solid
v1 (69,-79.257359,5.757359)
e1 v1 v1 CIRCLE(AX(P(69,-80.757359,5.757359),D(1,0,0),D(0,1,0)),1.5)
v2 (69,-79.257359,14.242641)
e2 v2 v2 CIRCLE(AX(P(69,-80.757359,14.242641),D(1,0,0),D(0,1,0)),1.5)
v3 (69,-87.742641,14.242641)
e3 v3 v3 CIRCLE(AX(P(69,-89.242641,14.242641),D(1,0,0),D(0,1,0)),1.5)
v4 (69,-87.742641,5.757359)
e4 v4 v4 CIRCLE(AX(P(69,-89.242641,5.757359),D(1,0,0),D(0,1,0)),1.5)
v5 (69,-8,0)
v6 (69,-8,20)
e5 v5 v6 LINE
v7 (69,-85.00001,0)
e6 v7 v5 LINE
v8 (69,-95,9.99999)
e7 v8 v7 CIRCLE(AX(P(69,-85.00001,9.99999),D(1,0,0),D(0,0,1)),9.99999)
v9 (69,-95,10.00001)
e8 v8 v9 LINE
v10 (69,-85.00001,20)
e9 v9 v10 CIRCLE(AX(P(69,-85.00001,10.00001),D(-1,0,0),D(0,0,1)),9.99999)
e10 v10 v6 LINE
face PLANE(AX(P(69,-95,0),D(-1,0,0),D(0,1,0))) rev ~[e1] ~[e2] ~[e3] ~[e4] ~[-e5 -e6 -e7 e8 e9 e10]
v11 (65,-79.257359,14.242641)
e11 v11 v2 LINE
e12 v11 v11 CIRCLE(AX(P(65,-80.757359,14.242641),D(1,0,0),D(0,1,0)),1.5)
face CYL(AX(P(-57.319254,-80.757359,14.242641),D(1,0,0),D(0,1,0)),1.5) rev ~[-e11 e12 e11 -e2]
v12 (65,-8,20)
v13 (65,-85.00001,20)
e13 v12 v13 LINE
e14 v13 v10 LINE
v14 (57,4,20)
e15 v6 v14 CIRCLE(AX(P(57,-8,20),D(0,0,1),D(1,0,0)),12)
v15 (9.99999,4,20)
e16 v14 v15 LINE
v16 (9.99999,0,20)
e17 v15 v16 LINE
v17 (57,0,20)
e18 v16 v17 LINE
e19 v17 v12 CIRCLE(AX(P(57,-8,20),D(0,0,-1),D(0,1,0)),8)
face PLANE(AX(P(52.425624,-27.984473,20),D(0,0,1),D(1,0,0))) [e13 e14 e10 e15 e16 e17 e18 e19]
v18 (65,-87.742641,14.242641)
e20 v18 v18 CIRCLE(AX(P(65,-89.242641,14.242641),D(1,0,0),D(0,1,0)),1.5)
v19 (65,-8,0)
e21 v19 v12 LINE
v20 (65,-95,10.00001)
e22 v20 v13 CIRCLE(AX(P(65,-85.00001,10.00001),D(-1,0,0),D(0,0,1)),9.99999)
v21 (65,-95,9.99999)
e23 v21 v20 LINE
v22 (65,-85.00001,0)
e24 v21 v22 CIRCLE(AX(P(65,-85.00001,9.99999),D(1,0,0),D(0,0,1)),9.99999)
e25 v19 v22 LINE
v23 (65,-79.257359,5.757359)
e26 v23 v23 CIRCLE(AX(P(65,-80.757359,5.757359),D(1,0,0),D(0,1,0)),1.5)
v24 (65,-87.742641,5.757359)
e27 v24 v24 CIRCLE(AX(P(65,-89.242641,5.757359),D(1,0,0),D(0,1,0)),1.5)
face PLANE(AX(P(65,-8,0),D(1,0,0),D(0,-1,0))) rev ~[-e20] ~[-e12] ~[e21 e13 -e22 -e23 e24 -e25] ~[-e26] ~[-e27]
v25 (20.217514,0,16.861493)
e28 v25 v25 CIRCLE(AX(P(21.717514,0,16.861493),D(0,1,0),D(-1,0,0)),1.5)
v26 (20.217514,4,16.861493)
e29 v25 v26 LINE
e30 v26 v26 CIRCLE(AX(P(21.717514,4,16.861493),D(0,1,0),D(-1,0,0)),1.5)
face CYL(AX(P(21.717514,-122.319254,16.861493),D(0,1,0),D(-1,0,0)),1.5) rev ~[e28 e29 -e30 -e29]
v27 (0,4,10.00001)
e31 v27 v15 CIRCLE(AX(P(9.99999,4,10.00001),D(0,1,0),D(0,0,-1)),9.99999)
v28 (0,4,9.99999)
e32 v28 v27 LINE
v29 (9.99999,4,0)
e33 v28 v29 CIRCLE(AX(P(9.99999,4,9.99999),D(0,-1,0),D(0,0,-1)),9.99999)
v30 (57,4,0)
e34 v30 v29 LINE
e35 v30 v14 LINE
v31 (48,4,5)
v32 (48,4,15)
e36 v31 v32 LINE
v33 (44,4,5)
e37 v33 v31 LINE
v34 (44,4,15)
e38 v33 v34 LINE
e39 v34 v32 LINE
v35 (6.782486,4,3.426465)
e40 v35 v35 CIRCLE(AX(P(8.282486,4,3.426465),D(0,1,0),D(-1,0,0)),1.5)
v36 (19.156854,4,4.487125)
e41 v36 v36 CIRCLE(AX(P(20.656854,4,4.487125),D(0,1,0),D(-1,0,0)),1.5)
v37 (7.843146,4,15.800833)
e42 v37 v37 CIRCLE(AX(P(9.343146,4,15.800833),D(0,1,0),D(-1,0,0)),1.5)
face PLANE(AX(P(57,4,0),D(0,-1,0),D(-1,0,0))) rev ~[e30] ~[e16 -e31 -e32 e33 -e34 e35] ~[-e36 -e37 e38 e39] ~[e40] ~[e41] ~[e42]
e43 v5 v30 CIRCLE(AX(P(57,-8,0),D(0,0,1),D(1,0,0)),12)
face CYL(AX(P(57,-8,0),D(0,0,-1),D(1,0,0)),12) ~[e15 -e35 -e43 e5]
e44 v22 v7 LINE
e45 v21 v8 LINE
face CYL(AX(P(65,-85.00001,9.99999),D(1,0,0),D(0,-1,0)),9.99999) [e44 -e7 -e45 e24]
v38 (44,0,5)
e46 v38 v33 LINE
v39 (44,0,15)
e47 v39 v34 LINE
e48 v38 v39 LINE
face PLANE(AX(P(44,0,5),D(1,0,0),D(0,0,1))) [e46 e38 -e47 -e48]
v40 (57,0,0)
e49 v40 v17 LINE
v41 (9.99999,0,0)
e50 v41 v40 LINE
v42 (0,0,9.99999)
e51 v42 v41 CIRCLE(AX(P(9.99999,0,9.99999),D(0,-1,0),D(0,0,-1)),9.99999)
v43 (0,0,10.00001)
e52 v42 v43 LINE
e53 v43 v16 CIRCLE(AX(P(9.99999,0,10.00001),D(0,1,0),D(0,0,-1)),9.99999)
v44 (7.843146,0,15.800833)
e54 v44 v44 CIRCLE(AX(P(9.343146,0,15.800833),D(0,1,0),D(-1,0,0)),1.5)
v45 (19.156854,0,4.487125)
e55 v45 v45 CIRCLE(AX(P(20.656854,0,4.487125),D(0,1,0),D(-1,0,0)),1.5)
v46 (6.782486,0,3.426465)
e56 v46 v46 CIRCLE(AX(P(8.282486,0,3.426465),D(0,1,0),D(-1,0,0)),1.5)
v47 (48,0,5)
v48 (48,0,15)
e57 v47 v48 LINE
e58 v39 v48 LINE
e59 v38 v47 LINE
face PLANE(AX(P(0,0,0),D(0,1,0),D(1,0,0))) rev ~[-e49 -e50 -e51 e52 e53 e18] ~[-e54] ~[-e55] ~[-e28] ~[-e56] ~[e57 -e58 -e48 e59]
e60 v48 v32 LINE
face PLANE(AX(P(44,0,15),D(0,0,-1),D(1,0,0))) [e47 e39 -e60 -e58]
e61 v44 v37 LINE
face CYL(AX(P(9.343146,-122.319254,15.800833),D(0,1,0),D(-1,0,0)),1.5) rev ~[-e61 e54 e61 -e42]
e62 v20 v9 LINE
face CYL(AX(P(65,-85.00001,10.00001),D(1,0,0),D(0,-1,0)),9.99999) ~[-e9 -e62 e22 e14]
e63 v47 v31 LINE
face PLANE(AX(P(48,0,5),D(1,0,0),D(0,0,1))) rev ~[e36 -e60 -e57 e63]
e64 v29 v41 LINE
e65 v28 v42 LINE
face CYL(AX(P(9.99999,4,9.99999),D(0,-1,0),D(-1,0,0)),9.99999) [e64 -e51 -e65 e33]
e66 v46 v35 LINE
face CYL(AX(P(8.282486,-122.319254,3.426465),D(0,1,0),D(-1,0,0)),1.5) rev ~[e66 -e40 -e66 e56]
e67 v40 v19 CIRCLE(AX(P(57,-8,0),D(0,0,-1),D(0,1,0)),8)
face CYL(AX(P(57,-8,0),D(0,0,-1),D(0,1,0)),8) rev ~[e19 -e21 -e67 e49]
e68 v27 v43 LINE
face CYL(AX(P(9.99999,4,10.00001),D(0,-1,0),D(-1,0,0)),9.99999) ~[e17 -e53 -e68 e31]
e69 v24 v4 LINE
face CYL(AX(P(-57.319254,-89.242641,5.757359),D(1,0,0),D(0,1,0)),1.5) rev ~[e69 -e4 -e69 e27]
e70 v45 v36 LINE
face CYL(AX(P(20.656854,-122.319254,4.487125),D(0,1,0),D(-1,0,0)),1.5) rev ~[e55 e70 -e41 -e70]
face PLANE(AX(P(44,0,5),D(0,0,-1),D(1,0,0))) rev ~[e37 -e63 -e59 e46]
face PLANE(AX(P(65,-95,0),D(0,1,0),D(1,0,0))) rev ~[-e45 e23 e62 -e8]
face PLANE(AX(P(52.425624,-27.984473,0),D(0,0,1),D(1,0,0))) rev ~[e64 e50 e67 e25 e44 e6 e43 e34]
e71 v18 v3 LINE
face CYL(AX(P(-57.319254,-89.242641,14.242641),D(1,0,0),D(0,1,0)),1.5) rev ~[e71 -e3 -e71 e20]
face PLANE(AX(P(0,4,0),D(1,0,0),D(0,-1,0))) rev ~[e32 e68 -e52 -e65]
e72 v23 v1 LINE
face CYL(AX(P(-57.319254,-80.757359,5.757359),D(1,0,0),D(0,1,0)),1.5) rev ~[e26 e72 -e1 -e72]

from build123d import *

# Parameters (mm, degrees)
F1_DEPTH = 20
F4_R     = 9.99999
F6_D     = 3
F2_W     = 4
F2_H     = 10
F7_DEPTH = 25
F8_D     = 3


# Not quite as in the source:
# - a fillet or chamfer is up to 0.001 mm smaller than in the source, because OpenCascade refuses the exact size
# - a feature names something its author has since deleted; it is built from what else it names


with BuildPart() as f1:
    # F0 (on Top) → F1 (new body)
    with BuildSketch(Plane.XY):
        with BuildLine():
            Line((0, 4), (0, 0))
            Line((0, 0), (57, 0))
            ThreePointArc((57, 0), (62.6568542495, -2.3431457505), (65, -8))
            Line((65, -8), (65, -95))
            Line((65, -95), (69, -95))
            Line((69, -95), (69, -8))
            ThreePointArc((69, -8), (65.4852813742, 0.4852813742), (57, 4))
            Line((57, 4), (0, 4))
        make_face()
    extrude(amount=F1_DEPTH)

    # F4 (radius 10 in the source; OpenCascade refuses exactly that, so slightly less here)
    f4_edges = [f1.edges().sort_by_distance(p)[0] for p in [
        (0, 2, 20),
        (0, 2, 0),
        (67, -95, 20),
        (67, -95, 0),
    ]]
    fillet(f4_edges, radius=F4_R)

    # F6 (through all)
    with Locations(Plane(origin=(65, 0, 0), x_dir=(0, -1, 0), z_dir=(-1, 0, 0))):
        with Locations((80.7573593129, 14.2426406871), (80.7573593129, 5.7573593129), (89.2426406871, 5.7573593129), (89.2426406871, 14.2426406871)):
            Hole(F6_D / 2)

    # F2 (on face) → F7 (cut)
    with BuildSketch(Plane.XZ):
        with Locations((46, 10)):
            Rectangle(F2_W, F2_H)
    extrude(amount=-F7_DEPTH, mode=Mode.SUBTRACT)

    # F8 (through all)
    with Locations(Plane.XZ):
        with Locations((8.2824855787, 3.4264645687), (21.7175144213, 16.8614934112), (20.6568542495, 4.4871247404), (9.3431457505, 15.8008332394)):
            Hole(F8_D / 2)


solid = f1.part
